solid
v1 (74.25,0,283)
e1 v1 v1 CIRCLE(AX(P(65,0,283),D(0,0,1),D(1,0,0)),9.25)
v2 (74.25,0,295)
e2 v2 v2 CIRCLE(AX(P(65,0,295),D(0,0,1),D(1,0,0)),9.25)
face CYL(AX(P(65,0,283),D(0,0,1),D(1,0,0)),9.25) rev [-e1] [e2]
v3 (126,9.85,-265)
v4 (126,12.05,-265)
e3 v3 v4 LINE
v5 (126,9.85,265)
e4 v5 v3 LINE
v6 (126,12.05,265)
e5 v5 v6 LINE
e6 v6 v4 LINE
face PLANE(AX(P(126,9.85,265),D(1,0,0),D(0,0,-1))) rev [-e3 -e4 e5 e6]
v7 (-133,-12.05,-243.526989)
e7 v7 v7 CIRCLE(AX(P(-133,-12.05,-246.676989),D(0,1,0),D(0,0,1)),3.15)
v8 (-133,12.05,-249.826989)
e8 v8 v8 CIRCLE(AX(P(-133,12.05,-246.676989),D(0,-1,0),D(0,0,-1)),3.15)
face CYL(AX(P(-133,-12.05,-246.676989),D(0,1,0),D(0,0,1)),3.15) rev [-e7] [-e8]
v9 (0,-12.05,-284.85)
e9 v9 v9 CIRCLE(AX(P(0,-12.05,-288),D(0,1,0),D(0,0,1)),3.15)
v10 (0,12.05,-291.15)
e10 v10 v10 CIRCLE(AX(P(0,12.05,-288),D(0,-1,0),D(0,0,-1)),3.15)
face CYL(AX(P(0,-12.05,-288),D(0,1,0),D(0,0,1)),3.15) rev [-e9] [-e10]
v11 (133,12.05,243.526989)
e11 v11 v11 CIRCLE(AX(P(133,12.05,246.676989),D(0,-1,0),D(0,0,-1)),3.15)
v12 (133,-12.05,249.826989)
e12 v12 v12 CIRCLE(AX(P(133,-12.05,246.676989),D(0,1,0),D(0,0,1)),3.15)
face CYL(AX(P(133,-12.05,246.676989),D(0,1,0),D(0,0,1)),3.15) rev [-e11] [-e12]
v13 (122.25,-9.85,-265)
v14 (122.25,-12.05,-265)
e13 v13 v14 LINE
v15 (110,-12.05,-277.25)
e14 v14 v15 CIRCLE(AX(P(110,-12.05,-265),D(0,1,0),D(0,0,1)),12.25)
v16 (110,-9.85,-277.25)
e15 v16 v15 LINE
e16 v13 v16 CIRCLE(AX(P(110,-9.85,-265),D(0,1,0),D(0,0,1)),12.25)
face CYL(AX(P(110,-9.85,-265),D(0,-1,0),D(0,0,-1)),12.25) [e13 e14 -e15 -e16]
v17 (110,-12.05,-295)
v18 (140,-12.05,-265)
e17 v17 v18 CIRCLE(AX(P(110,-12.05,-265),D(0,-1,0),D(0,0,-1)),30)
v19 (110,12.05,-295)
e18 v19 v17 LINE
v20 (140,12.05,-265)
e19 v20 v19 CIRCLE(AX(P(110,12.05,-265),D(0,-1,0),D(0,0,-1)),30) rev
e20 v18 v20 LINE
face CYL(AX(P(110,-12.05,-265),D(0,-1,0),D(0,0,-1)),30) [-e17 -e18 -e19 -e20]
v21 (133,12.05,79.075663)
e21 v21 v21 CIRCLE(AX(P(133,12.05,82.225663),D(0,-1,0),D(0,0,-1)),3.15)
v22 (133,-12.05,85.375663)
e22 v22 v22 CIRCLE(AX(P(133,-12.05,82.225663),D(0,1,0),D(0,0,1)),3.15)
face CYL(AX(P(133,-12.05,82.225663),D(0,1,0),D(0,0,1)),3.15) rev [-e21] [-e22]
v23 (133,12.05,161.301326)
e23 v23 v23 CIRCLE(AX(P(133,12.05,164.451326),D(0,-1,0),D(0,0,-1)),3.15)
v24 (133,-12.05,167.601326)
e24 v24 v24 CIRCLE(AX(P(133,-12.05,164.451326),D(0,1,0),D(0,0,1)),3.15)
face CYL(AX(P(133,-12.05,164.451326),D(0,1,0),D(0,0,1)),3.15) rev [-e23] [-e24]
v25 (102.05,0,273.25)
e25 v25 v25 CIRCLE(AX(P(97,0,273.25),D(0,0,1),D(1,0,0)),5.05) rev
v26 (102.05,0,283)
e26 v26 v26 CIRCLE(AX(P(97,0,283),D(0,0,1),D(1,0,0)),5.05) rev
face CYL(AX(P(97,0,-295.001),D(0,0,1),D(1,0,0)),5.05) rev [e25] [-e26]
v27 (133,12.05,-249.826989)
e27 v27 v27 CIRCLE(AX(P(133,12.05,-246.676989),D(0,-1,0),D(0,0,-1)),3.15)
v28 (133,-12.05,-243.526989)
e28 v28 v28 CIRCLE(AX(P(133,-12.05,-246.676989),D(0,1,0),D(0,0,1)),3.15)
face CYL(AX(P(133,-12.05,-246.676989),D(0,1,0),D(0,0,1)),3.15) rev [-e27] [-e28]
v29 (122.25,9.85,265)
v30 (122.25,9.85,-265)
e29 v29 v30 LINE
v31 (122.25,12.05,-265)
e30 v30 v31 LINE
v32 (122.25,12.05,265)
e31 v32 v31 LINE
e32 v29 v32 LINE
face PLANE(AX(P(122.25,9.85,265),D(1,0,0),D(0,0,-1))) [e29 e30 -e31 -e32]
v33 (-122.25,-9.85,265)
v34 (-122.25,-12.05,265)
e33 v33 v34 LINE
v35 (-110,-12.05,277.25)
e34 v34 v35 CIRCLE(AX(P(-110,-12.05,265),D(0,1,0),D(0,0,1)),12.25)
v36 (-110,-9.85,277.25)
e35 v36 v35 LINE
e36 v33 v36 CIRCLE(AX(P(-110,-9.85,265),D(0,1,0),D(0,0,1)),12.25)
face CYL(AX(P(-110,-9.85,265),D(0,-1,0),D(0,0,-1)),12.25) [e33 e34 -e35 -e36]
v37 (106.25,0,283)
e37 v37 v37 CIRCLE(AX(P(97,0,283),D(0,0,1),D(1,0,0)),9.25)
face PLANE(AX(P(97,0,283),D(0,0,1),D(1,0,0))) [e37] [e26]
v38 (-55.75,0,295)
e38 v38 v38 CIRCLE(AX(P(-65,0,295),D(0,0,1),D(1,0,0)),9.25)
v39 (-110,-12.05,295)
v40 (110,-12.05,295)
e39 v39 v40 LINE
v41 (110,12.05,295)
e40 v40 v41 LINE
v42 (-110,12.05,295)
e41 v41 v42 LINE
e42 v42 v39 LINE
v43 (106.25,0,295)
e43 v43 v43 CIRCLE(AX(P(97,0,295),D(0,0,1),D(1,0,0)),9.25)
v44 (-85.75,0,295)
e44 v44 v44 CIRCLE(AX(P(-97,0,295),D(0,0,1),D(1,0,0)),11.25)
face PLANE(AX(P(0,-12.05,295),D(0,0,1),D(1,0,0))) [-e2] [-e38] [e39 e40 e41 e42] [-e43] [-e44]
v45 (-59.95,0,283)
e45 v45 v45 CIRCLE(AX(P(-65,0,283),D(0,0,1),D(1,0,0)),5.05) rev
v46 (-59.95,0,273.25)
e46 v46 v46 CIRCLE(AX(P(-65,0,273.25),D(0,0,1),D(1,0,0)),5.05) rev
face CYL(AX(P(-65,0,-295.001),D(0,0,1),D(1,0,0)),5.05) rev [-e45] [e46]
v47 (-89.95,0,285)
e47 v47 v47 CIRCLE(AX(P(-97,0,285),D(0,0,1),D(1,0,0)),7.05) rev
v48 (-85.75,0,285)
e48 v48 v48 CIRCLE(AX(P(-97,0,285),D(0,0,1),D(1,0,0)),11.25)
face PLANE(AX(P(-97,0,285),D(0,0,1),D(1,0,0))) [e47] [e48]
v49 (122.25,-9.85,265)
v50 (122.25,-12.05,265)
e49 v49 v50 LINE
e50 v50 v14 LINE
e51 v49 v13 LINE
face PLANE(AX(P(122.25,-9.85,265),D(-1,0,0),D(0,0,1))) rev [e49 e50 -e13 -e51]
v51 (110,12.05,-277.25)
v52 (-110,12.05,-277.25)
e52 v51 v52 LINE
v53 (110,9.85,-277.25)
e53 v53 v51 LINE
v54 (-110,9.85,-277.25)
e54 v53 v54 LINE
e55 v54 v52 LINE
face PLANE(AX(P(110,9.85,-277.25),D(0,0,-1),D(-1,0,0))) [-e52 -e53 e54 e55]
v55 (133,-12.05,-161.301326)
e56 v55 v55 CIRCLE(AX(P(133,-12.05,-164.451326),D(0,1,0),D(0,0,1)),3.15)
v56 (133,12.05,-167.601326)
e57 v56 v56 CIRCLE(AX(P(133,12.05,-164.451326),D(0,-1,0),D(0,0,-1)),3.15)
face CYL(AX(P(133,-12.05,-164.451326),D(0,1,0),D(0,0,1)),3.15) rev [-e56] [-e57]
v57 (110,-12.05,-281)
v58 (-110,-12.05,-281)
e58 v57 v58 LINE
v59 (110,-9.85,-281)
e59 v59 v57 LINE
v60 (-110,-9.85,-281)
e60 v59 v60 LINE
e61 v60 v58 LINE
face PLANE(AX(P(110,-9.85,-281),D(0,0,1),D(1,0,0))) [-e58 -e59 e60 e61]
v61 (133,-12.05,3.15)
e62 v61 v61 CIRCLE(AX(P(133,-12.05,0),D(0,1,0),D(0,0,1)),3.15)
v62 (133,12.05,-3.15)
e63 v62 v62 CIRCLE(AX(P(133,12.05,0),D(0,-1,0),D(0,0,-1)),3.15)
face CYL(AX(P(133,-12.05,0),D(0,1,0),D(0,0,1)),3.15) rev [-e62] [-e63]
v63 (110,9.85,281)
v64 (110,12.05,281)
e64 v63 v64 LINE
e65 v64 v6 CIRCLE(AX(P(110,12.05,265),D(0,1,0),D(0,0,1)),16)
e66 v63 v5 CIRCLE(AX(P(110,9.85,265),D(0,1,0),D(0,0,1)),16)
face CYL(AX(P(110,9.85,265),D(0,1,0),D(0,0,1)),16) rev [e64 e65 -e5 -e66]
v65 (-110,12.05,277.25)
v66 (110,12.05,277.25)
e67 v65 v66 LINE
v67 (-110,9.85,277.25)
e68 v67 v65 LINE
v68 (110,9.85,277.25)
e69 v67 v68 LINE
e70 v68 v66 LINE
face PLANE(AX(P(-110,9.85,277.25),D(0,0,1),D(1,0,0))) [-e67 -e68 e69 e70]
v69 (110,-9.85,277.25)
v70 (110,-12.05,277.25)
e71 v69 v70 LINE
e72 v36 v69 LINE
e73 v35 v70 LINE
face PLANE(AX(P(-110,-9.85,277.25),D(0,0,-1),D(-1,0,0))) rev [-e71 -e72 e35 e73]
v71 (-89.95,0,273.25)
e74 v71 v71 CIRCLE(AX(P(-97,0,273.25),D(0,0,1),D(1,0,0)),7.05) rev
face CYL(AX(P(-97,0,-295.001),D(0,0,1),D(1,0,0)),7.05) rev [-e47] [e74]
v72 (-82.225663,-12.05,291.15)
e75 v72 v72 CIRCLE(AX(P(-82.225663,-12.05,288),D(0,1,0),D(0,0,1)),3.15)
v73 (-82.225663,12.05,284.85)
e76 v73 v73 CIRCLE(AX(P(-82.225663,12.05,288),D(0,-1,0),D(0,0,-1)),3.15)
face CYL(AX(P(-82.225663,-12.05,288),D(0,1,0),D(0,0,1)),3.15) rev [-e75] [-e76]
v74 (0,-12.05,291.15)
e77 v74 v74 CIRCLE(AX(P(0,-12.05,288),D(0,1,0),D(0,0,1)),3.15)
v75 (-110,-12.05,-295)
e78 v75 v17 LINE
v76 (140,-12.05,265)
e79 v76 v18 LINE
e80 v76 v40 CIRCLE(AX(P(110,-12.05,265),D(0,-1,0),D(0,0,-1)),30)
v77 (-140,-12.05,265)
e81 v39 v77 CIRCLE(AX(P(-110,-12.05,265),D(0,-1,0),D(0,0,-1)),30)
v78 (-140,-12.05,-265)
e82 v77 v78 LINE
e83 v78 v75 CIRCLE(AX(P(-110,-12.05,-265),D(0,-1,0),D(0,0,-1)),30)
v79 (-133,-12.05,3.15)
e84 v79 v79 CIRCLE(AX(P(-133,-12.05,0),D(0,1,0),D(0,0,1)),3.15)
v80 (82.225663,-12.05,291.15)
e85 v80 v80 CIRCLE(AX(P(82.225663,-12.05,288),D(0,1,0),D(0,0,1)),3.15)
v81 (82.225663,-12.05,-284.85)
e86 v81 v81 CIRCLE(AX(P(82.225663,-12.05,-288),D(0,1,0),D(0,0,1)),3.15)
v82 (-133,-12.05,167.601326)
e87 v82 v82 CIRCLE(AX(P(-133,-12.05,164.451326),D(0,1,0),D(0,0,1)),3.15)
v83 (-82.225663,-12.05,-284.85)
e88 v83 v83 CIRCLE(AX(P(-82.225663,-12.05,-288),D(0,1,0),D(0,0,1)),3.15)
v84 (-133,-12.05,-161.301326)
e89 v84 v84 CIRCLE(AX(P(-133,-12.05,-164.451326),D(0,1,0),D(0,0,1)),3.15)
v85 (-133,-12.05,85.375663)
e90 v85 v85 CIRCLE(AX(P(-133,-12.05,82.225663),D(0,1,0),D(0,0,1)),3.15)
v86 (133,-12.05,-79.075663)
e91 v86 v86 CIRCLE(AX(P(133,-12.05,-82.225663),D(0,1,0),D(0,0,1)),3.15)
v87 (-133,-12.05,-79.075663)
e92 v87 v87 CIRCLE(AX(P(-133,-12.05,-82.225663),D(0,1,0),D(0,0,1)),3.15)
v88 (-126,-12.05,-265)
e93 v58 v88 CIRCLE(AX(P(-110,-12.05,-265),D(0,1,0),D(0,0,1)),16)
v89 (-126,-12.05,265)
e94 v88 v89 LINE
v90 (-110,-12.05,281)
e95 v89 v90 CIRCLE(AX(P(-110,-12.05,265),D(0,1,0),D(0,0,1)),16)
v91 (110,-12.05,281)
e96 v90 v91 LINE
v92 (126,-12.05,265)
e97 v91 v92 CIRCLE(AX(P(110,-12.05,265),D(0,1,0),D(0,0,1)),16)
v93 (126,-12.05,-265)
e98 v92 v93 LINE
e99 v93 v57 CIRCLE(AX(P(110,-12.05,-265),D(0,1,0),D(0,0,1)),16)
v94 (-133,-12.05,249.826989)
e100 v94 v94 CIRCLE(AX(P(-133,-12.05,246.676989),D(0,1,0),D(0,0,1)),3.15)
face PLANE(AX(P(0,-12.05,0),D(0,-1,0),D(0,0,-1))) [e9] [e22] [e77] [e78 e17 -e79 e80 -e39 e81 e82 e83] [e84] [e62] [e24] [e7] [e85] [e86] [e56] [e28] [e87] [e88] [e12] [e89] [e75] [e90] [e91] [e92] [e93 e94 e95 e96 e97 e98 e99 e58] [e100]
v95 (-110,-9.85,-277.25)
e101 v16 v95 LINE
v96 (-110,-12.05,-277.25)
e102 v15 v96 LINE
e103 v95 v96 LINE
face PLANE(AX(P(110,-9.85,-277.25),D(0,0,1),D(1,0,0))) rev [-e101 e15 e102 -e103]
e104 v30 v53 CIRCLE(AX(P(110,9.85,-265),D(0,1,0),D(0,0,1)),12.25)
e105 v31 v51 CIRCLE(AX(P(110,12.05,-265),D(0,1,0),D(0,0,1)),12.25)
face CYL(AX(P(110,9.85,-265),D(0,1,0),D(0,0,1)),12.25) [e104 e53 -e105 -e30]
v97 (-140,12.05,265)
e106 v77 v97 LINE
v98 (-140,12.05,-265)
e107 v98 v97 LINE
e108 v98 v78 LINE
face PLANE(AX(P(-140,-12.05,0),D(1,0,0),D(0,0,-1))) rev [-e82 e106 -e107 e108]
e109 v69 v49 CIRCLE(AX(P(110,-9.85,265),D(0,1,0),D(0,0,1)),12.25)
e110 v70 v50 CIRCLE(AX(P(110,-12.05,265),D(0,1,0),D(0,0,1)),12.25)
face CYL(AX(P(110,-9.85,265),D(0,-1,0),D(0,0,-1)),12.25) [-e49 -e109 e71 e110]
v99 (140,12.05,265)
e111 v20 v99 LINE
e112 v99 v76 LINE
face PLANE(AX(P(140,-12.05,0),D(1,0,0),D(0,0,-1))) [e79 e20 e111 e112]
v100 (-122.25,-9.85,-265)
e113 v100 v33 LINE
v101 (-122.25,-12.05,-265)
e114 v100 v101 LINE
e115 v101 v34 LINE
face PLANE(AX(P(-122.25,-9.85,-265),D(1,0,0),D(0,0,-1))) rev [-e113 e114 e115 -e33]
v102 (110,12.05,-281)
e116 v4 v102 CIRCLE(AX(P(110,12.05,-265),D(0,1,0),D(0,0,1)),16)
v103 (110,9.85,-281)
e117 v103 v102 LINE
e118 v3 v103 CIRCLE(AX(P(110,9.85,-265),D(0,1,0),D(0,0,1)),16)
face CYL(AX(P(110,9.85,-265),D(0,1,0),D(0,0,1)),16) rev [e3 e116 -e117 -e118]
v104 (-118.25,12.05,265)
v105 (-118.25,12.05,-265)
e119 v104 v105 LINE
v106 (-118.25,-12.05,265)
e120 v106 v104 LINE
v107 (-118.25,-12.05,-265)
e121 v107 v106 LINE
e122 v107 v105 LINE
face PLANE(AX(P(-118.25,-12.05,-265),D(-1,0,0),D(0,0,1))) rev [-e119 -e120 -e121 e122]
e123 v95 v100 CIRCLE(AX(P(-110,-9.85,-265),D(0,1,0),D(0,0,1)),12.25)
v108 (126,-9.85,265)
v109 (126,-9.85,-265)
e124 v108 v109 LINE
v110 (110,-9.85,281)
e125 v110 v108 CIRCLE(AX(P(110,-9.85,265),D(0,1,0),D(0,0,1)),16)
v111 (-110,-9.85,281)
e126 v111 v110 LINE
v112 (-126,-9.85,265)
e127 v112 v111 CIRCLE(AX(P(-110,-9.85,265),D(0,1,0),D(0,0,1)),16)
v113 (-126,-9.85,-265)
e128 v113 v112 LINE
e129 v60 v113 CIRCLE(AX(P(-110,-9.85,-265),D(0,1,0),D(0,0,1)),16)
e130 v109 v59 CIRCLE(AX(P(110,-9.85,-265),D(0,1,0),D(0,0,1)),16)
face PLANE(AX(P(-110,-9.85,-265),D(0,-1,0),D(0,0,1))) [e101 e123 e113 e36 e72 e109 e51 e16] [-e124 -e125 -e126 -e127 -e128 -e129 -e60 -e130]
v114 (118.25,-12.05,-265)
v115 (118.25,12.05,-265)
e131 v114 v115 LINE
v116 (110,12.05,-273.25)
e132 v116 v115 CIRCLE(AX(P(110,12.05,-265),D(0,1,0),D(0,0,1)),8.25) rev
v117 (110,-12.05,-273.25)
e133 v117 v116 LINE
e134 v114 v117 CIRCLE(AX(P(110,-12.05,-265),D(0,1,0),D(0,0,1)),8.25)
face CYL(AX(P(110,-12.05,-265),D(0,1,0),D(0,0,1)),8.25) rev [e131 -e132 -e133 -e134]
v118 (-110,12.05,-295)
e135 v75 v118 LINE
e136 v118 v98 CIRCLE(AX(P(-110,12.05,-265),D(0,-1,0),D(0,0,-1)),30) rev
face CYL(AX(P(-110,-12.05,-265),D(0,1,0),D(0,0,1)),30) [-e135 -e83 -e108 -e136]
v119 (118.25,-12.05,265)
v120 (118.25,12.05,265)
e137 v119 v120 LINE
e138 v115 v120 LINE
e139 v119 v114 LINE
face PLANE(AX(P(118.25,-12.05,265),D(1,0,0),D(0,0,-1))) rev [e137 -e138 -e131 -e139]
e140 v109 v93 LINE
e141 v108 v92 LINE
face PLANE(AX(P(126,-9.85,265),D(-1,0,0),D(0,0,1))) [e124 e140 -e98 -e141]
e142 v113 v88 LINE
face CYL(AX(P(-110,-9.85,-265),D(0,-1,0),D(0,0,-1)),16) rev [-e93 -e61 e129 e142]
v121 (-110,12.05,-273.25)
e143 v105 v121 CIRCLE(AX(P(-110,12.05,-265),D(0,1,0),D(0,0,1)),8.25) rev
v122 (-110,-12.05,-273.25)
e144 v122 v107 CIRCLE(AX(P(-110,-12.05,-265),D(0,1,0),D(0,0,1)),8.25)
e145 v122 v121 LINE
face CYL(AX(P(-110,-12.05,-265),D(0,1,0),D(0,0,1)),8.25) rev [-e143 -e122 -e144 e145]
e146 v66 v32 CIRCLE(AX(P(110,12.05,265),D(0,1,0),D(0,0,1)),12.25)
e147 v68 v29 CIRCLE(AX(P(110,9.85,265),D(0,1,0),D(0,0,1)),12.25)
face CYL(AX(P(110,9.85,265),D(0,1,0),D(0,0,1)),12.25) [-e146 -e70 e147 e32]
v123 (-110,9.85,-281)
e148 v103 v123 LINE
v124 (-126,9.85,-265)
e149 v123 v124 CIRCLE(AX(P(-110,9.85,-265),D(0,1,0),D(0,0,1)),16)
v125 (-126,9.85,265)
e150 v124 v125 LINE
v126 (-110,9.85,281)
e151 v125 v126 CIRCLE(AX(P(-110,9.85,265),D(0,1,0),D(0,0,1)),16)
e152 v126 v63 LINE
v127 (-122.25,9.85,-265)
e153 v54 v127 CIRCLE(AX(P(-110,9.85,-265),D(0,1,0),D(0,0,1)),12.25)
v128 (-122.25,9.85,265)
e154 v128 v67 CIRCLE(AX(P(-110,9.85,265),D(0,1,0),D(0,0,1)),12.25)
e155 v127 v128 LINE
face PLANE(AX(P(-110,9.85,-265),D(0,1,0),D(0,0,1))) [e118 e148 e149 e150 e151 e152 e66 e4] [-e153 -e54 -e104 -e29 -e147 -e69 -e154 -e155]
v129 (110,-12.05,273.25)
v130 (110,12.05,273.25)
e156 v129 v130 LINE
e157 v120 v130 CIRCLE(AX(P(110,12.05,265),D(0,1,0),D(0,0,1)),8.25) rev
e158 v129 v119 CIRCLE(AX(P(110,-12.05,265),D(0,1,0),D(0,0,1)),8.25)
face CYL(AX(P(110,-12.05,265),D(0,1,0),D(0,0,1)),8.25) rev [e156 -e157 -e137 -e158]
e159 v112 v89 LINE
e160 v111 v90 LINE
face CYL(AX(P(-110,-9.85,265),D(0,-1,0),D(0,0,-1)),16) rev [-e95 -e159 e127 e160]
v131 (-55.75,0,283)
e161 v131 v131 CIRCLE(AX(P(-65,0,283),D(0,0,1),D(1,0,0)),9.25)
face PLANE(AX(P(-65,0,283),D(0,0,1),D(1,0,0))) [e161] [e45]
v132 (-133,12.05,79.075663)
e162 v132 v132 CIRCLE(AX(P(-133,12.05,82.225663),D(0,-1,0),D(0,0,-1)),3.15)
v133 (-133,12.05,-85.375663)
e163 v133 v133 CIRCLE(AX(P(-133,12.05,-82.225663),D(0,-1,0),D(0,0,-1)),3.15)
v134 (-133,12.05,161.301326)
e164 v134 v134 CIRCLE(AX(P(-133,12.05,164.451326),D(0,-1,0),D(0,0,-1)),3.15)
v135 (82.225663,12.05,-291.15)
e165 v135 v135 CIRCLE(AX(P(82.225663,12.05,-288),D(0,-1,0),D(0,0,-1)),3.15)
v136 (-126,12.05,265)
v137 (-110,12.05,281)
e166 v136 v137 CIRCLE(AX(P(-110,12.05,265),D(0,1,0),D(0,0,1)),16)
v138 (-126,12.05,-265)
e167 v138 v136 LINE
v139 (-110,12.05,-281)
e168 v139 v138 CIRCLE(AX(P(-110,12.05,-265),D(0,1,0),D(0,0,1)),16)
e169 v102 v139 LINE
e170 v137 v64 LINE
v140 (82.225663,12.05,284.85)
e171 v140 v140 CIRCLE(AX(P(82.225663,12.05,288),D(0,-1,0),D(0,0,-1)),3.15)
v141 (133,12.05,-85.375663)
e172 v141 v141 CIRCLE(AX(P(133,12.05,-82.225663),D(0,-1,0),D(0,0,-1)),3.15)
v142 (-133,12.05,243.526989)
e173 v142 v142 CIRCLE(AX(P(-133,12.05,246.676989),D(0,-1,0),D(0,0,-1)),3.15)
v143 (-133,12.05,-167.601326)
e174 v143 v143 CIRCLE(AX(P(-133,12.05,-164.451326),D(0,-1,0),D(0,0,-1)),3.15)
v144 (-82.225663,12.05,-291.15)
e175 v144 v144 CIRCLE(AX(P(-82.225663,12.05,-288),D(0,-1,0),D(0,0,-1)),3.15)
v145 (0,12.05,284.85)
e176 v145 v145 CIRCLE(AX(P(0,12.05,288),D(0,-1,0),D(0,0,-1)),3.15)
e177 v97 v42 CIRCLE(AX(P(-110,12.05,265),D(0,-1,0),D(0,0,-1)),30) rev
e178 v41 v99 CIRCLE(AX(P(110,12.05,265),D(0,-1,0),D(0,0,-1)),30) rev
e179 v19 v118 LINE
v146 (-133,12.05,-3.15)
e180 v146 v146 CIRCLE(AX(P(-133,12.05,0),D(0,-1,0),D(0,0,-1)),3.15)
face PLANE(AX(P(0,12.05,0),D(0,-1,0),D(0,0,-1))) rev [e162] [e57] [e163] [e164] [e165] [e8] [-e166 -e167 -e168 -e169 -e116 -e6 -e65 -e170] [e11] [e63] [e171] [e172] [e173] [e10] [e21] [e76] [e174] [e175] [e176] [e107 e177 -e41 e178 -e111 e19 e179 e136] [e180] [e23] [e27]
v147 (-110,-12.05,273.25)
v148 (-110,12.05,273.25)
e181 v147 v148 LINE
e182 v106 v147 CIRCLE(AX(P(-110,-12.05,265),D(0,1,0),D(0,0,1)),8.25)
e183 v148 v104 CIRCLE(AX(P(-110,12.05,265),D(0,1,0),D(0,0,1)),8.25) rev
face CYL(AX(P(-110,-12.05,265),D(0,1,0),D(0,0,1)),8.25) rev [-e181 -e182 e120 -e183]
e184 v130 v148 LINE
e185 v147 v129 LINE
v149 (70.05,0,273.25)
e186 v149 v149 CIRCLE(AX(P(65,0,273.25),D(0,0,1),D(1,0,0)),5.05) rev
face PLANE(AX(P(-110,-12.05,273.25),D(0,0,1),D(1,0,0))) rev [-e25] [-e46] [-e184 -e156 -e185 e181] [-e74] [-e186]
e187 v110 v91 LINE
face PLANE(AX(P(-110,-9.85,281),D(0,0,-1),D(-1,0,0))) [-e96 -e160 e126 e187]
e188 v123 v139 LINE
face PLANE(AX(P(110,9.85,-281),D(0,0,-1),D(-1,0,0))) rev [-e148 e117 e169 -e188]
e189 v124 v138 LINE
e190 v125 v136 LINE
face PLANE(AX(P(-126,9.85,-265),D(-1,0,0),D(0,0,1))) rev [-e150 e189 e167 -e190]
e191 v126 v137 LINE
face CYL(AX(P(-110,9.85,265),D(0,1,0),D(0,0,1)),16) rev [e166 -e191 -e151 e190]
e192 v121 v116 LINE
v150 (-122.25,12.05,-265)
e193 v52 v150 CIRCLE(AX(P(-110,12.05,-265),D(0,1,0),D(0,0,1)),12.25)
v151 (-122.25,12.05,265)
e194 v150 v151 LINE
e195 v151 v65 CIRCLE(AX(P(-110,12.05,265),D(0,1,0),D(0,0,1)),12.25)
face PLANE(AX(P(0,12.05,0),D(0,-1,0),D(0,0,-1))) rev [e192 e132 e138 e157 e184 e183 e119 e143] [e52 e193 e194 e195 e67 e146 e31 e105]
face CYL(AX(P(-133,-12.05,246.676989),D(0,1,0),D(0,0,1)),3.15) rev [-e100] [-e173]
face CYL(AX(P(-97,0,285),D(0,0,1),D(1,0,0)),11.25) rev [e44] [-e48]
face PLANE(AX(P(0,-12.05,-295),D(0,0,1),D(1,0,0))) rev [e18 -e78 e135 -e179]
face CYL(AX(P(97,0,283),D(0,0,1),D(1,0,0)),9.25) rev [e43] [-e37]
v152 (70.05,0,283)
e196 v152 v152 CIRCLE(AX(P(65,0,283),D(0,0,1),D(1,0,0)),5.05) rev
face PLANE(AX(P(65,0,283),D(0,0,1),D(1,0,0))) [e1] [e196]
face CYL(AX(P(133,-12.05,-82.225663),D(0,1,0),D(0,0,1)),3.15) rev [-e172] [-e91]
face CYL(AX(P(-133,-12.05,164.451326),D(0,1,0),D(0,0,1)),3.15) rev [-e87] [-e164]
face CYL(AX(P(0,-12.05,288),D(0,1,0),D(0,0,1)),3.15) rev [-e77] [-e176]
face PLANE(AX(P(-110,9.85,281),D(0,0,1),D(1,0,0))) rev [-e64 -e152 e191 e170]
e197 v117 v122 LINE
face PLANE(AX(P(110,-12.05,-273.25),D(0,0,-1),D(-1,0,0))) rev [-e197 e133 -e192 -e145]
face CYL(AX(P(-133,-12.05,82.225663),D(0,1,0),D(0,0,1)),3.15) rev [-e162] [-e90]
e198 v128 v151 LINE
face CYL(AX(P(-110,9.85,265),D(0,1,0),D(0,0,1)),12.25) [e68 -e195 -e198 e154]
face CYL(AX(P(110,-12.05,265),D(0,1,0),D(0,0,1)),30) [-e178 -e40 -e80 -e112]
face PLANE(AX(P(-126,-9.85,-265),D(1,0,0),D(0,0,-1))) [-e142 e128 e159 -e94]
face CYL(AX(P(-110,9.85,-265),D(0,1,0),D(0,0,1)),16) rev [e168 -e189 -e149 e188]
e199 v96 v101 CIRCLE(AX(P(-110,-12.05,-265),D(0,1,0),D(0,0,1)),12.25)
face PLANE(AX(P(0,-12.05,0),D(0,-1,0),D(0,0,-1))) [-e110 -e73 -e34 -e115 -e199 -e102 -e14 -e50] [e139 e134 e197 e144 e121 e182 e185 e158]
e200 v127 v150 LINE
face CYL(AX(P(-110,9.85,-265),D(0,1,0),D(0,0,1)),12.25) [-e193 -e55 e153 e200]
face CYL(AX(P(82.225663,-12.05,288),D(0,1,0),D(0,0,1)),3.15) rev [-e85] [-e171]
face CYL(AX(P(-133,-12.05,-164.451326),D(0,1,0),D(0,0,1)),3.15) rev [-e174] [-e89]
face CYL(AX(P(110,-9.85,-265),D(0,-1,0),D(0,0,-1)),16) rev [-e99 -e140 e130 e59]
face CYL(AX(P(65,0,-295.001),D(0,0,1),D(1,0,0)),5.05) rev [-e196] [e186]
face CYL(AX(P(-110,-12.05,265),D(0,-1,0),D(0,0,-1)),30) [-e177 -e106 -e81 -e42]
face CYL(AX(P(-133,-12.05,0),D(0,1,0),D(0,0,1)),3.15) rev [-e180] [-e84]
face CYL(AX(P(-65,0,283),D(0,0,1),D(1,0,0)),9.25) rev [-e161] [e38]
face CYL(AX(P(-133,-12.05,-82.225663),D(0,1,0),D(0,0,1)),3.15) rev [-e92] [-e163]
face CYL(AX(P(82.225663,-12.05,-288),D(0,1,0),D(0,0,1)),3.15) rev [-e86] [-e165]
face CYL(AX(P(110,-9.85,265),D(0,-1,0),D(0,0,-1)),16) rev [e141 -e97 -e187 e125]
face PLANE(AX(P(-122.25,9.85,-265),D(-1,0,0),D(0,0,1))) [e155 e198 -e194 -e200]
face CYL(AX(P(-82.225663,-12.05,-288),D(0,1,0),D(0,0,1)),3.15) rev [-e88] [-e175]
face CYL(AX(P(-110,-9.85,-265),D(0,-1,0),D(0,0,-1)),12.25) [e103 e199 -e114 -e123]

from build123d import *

# Parameters (mm, degrees)
SKETCH1_W                      = 304.8
SKETCH1_H                      = 609.6
F_1_X2_HDPE_STOCK_DEPTH        = 12.05
BASE_ENCLOSURE_DIMS_DEPTH      = 342.627882352
BASE_ENCLOSURE_DIMS_DEPTH_BACK = 342.627882352
SKETCH2_W                      = 304.8
SKETCH2_H                      = 609.6
SKETCH2_W_2                    = 280
SKETCH2_H_2                    = 590
FILLET1_R                      = 30
SKETCH3_R                      = 3.15
CUT_EXTRUDE4_DEPTH             = 328.422983311
CRVPATTERN1_START              = -13
CRVPATTERN1_OUTLINE_R          = 3.15
CRVPATTERN1_DEPTH              = 26
ORING_GROOVE_DEPTH             = 2.2
CUT_EXTRUDE6_DEPTH             = 328.422983311
CUT_EXTRUDE6_DEPTH_BACK        = 328.422983311
CUT_EXTRUDE7_REACH             = 608.502
SKETCH7_R                      = 5.05
SKETCH7_R_2                    = 7.05
SKETCH8_R                      = 11.25
CUT_EXTRUDE8_DEPTH             = 10
SKETCH9_R                      = 9.25
CUT_EXTRUDE9_DEPTH             = 12


with BuildPart() as part:
    # Sketch1 → 1"x2" HDPE Stock (new, symmetric)
    with BuildSketch(Plane(origin=(0, 0, 0), x_dir=(1, 0, 0), z_dir=(0, 1, 0))):
        Rectangle(SKETCH1_W, SKETCH1_H)
    extrude(amount=F_1_X2_HDPE_STOCK_DEPTH, both=True)

    # Sketch2 → Base Enclosure Dims (cut, two sides: drawn at the far end of the back side and taken through both)
    with BuildSketch(Plane(origin=(0, 12.05, 0), x_dir=(1, 0, 0), z_dir=(0, 1, 0)).offset(-BASE_ENCLOSURE_DIMS_DEPTH_BACK)):
        Rectangle(SKETCH2_W, SKETCH2_H)
        Rectangle(SKETCH2_W_2, SKETCH2_H_2, mode=Mode.SUBTRACT)
    extrude(amount=BASE_ENCLOSURE_DIMS_DEPTH + BASE_ENCLOSURE_DIMS_DEPTH_BACK, mode=Mode.SUBTRACT)

    # Fillet1
    fillet1_edges = [part.edges().sort_by_distance(p)[0] for p in [
        (140, 0, 295),
        (140, 0, -295),
        (-140, 0, -295),
        (-140, 0, 295),
    ]]
    fillet(fillet1_edges, radius=FILLET1_R)

    # Sketch3 → Cut-Extrude4 (cut, symmetric)
    with BuildSketch(Plane(origin=(0, 12.05, 0), x_dir=(1, 0, 0), z_dir=(0, 1, 0))):
        with Locations(Location((0, -288, 0), (0, 0, 270))):
            Circle(SKETCH3_R)
    extrude(amount=CUT_EXTRUDE4_DEPTH, both=True, mode=Mode.SUBTRACT)

    # CrvPattern1: read off the stored shape, not the designer's step
    # CrvPattern1 outline → CrvPattern1 (cut)
    with BuildSketch(Plane(origin=(0, 0, 0), x_dir=(1, 0, 0), z_dir=(0, 1, 0)).offset(CRVPATTERN1_START)):
        with Locations((82.225663103, -288)):
            Circle(CRVPATTERN1_OUTLINE_R)
        with Locations((-82.225663103, -288)):
            Circle(CRVPATTERN1_OUTLINE_R)
        with Locations((-133, -246.67698931)):
            Circle(CRVPATTERN1_OUTLINE_R)
        with Locations((-133, -164.451326207)):
            Circle(CRVPATTERN1_OUTLINE_R)
        with Locations((-133, -82.225663103)):
            Circle(CRVPATTERN1_OUTLINE_R)
        with Locations((-133, 0)):
            Circle(CRVPATTERN1_OUTLINE_R)
        with Locations((-133, 82.225663103)):
            Circle(CRVPATTERN1_OUTLINE_R)
        with Locations((-133, 164.451326207)):
            Circle(CRVPATTERN1_OUTLINE_R)
        with Locations((-133, 246.67698931)):
            Circle(CRVPATTERN1_OUTLINE_R)
        with Locations((-82.225663103, 288)):
            Circle(CRVPATTERN1_OUTLINE_R)
        with Locations((0, 288)):
            Circle(CRVPATTERN1_OUTLINE_R)
        with Locations((82.225663103, 288)):
            Circle(CRVPATTERN1_OUTLINE_R)
        with Locations((133, 246.67698931)):
            Circle(CRVPATTERN1_OUTLINE_R)
        with Locations((133, 164.451326207)):
            Circle(CRVPATTERN1_OUTLINE_R)
        with Locations((133, 82.225663103)):
            Circle(CRVPATTERN1_OUTLINE_R)
        with Locations((133, 0)):
            Circle(CRVPATTERN1_OUTLINE_R)
        with Locations((133, -82.225663103)):
            Circle(CRVPATTERN1_OUTLINE_R)
        with Locations((133, -164.451326207)):
            Circle(CRVPATTERN1_OUTLINE_R)
        with Locations((133, -246.67698931)):
            Circle(CRVPATTERN1_OUTLINE_R)
    extrude(amount=CRVPATTERN1_DEPTH, mode=Mode.SUBTRACT)

    # Sketch5 → Oring Groove (cut)
    with BuildSketch(Plane(origin=(0, 12.05, 0), x_dir=(1, 0, 0), z_dir=(0, 1, 0))):
        with BuildLine():
            Line((-126, 265), (-126, -265))
            ThreePointArc((-126, -265), (-121.313708499, -276.313708499), (-110, -281))
            Line((-110, -281), (110, -281))
            ThreePointArc((110, -281), (121.313708499, -276.313708499), (126, -265))
            Line((126, -265), (126, 265))
            ThreePointArc((126, 265), (121.313708499, 276.313708499), (110, 281))
            Line((110, 281), (-110, 281))
            ThreePointArc((-110, 281), (-121.313708499, 276.313708499), (-126, 265))
        make_face()
        with BuildLine():
            Line((122.25, -265), (122.25, 265))
            ThreePointArc((122.25, 265), (118.66205807, 273.66205807), (110, 277.25))
            Line((110, 277.25), (-110, 277.25))
            ThreePointArc((-110, 277.25), (-118.66205807, 273.66205807), (-122.25, 265))
            Line((-122.25, 265), (-122.25, -265))
            ThreePointArc((-122.25, -265), (-118.66205807, -273.66205807), (-110, -277.25))
            Line((-110, -277.25), (110, -277.25))
            ThreePointArc((110, -277.25), (118.66205807, -273.66205807), (122.25, -265))
        make_face(mode=Mode.SUBTRACT)
    oring_groove = extrude(amount=-ORING_GROOVE_DEPTH, mode=Mode.SUBTRACT)

    # Sketch6 → Cut-Extrude6 (cut, two sides: drawn at the far end of the back side and taken through both)
    with BuildSketch(Plane(origin=(0, 12.05, 0), x_dir=(1, 0, 0), z_dir=(0, 1, 0)).offset(-CUT_EXTRUDE6_DEPTH_BACK)):
        with BuildLine():
            Line((118.25, -265), (118.25, 265))
            ThreePointArc((118.25, 265), (115.833630945, 270.833630945), (110, 273.25))
            Line((110, 273.25), (-110, 273.25))
            ThreePointArc((-110, 273.25), (-115.833630945, 270.833630945), (-118.25, 265))
            Line((-118.25, 265), (-118.25, -265))
            ThreePointArc((-118.25, -265), (-115.833630945, -270.833630945), (-110, -273.25))
            Line((-110, -273.25), (110, -273.25))
            ThreePointArc((110, -273.25), (115.833630945, -270.833630945), (118.25, -265))
        make_face()
    extrude(amount=CUT_EXTRUDE6_DEPTH + CUT_EXTRUDE6_DEPTH_BACK, mode=Mode.SUBTRACT)

    # Mirror1: Oring Groove across plane
    add(oring_groove.mirror(Plane.ZX), mode=Mode.SUBTRACT)

    # Sketch7 → Cut-Extrude7 (cut, up to next)
    with BuildSketch(Plane.XY.offset(295), mode=Mode.PRIVATE) as cut_extrude7_sk1:
        with Locations((-65, 0)):
            Circle(SKETCH7_R)
    cut_extrude7_tool1 = extrude(cut_extrude7_sk1.sketch, amount=-CUT_EXTRUDE7_REACH, mode=Mode.PRIVATE) & part.part
    # Sketch7 → Cut-Extrude7 (cut, up to next)
    with BuildSketch(Plane.XY.offset(295), mode=Mode.PRIVATE) as cut_extrude7_sk2:
        with Locations((-97, 0)):
            Circle(SKETCH7_R_2)
    cut_extrude7_tool2 = extrude(cut_extrude7_sk2.sketch, amount=-CUT_EXTRUDE7_REACH, mode=Mode.PRIVATE) & part.part
    # Sketch7 → Cut-Extrude7 (cut, up to next)
    with BuildSketch(Plane.XY.offset(295), mode=Mode.PRIVATE) as cut_extrude7_sk3:
        with Locations((97, 0)):
            Circle(SKETCH7_R)
    cut_extrude7_tool3 = extrude(cut_extrude7_sk3.sketch, amount=-CUT_EXTRUDE7_REACH, mode=Mode.PRIVATE) & part.part
    # Sketch7 → Cut-Extrude7 (cut, up to next)
    with BuildSketch(Plane.XY.offset(295), mode=Mode.PRIVATE) as cut_extrude7_sk4:
        with Locations((65, 0)):
            Circle(SKETCH7_R)
    cut_extrude7_tool4 = extrude(cut_extrude7_sk4.sketch, amount=-CUT_EXTRUDE7_REACH, mode=Mode.PRIVATE) & part.part
    add(cut_extrude7_tool1.solids().sort_by_distance((-65, 0, 295))[0], mode=Mode.SUBTRACT)
    add(cut_extrude7_tool2.solids().sort_by_distance((-97, 0, 295))[0], mode=Mode.SUBTRACT)
    add(cut_extrude7_tool3.solids().sort_by_distance((97, 0, 295))[0], mode=Mode.SUBTRACT)
    add(cut_extrude7_tool4.solids().sort_by_distance((65, 0, 295))[0], mode=Mode.SUBTRACT)

    # Sketch8 → Cut-Extrude8 (cut)
    with BuildSketch(Plane.XY.offset(295)):
        with Locations((-97, 0)):
            Circle(SKETCH8_R)
    extrude(amount=-CUT_EXTRUDE8_DEPTH, mode=Mode.SUBTRACT)

    # Sketch9 → Cut-Extrude9 (cut)
    with BuildSketch(Plane.XY.offset(295)):
        with Locations((-65, 0)):
            Circle(SKETCH9_R)
        with Locations((65, 0)):
            Circle(SKETCH9_R)
        with Locations((97, 0)):
            Circle(SKETCH9_R)
    extrude(amount=-CUT_EXTRUDE9_DEPTH, mode=Mode.SUBTRACT)


solid = part.part
